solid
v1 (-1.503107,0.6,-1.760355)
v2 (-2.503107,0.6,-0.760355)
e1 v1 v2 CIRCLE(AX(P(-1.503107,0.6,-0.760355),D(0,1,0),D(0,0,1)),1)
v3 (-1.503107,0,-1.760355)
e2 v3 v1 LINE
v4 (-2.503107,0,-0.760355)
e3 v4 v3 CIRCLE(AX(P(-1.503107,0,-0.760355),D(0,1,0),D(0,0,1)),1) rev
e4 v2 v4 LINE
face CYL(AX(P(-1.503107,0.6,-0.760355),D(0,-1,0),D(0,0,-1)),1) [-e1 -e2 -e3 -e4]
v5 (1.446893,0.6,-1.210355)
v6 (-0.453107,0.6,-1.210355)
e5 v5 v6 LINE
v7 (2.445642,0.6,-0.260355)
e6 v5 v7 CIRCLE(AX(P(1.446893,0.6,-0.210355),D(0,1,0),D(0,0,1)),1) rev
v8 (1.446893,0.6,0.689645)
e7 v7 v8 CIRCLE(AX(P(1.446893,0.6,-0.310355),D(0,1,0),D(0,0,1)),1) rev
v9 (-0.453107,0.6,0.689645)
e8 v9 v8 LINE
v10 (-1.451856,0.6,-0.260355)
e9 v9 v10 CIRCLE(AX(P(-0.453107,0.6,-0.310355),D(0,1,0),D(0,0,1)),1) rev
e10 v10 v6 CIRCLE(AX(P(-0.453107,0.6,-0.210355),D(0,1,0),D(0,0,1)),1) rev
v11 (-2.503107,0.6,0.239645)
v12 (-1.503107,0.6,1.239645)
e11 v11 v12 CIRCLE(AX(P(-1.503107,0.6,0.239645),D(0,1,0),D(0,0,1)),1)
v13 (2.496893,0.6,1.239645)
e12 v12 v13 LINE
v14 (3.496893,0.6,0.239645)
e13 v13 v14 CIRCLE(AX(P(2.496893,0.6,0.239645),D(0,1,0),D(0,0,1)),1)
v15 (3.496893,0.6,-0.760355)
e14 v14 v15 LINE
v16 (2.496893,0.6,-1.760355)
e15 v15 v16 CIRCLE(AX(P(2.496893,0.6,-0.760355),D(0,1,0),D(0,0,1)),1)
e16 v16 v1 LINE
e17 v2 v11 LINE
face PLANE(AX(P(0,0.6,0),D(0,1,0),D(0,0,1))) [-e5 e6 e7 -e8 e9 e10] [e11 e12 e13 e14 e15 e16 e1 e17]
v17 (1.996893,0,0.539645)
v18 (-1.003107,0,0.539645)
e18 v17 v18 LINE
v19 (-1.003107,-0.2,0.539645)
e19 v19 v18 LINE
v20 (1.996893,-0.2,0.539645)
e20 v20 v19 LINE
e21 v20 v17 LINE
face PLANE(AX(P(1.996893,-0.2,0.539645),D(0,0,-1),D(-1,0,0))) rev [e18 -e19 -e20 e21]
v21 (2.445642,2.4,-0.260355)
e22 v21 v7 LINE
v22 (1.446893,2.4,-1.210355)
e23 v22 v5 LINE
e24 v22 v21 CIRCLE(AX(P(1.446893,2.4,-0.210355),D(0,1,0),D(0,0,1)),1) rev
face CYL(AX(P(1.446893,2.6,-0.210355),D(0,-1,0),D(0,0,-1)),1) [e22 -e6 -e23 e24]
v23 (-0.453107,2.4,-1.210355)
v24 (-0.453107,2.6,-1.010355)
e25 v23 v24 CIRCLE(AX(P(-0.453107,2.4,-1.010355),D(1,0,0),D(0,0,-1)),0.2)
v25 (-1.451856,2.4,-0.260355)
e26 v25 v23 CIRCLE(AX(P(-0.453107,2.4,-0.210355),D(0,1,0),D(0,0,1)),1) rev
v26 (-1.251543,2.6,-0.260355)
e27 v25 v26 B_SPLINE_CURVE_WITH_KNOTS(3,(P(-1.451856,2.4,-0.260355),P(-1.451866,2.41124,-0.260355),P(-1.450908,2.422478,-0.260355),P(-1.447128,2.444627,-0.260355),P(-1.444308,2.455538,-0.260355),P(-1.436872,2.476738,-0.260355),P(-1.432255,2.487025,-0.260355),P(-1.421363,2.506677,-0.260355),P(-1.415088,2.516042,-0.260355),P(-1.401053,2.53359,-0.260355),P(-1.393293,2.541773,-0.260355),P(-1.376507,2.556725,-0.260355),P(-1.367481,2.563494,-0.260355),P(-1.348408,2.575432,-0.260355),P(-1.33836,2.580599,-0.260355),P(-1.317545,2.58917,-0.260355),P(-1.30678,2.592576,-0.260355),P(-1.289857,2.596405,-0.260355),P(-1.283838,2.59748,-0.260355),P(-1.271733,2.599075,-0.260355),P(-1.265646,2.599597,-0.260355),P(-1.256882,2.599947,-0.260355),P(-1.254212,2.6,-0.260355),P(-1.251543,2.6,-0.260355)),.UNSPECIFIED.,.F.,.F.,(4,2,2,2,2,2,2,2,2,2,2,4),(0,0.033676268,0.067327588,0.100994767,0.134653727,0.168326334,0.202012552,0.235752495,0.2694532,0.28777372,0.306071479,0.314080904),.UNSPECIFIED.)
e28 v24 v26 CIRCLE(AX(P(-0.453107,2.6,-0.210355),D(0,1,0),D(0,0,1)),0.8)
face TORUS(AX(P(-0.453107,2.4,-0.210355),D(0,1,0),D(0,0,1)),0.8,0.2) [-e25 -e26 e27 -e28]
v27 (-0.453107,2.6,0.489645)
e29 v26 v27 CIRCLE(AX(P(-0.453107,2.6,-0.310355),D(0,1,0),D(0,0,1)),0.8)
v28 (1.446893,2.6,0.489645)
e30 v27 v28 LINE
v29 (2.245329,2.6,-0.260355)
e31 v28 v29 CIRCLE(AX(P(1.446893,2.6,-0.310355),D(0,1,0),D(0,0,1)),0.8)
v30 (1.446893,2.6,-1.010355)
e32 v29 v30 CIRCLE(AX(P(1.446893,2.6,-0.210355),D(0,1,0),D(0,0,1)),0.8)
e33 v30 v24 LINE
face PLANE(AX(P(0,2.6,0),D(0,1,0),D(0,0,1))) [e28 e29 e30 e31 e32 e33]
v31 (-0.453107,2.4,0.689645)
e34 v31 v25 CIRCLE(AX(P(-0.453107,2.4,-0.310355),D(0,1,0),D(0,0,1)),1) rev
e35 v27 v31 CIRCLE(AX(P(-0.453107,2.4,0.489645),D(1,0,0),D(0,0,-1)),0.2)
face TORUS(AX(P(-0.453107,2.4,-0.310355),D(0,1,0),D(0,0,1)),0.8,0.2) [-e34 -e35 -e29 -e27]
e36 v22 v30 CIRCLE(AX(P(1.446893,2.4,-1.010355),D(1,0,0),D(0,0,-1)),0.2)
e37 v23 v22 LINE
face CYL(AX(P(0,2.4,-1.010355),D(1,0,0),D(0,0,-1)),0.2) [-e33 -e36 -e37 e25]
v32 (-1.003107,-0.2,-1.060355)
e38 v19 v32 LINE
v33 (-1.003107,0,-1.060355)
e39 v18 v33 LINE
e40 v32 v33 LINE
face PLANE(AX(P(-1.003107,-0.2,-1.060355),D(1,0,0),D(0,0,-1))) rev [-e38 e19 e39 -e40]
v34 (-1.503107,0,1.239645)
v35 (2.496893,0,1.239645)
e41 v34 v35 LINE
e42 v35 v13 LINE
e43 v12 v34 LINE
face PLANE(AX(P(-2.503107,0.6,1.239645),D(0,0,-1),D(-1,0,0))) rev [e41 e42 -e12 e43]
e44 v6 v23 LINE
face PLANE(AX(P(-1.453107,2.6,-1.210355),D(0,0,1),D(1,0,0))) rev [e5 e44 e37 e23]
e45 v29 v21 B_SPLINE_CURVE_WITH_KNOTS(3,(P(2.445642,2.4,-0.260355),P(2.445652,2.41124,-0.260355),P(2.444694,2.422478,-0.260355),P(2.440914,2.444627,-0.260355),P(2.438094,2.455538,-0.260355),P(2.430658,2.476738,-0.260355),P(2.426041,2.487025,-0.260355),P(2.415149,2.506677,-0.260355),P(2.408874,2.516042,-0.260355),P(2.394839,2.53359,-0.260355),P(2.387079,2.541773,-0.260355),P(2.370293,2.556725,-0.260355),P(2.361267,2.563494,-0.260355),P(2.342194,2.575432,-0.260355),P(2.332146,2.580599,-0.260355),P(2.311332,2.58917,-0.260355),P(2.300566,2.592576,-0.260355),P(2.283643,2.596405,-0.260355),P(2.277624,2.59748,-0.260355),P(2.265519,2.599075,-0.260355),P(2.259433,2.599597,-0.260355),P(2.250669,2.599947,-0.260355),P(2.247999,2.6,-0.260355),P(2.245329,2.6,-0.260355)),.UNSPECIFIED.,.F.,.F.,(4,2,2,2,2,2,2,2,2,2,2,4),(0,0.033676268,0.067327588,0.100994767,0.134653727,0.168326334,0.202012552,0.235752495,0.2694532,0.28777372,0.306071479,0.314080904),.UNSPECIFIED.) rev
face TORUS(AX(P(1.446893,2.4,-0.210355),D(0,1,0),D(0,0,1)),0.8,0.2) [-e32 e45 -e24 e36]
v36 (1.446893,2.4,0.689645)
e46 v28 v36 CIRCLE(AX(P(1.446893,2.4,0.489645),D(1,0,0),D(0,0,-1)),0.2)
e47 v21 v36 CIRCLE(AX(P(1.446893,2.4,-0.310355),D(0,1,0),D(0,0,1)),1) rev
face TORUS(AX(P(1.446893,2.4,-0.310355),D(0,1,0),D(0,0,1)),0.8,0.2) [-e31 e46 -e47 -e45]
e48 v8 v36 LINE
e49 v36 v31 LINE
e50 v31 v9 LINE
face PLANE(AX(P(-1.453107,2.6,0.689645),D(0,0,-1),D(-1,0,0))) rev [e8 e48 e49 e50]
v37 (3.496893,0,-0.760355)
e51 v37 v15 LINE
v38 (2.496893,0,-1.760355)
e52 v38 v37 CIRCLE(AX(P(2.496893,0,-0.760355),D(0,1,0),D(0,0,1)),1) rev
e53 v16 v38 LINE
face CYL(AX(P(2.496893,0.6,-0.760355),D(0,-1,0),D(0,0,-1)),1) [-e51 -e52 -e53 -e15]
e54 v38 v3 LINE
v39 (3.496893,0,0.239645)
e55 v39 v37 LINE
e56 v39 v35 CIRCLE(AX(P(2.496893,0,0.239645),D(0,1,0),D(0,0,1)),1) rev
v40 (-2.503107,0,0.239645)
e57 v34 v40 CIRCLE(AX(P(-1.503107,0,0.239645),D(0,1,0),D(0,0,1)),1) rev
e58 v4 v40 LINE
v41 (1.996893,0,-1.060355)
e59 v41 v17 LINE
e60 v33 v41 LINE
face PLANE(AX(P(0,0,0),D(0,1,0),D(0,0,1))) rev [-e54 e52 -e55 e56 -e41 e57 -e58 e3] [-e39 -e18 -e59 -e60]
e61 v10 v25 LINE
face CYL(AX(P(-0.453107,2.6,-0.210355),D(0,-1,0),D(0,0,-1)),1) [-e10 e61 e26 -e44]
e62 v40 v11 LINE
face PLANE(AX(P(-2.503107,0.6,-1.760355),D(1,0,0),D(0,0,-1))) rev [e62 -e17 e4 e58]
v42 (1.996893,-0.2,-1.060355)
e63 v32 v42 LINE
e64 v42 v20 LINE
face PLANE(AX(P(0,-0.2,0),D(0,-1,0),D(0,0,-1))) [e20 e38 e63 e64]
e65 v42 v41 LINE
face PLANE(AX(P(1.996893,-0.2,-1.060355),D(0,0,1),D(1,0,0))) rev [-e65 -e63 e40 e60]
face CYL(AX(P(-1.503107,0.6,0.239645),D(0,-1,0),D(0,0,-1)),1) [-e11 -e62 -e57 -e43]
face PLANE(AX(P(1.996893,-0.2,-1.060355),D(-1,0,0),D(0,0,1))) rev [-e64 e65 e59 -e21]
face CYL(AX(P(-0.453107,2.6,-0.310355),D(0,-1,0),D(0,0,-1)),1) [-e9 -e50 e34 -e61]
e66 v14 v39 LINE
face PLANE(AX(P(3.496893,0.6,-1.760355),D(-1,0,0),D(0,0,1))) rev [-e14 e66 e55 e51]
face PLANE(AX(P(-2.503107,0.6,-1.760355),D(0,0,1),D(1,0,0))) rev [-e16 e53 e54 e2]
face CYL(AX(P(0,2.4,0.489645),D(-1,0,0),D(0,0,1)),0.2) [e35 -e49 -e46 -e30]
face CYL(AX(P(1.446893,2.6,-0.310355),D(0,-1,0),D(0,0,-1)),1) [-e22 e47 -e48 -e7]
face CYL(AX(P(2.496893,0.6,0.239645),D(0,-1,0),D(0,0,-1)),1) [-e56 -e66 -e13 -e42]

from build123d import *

# Parameters (mm, degrees)
SKETCH_1_W      = 6
SKETCH_1_H      = 3
EXTRUDE_1_DEPTH = 0.6
SKETCH_2_W      = 3.9
SKETCH_2_H      = 1.9
EXTRUDE_2_DEPTH = 2
FILLET_1_R      = 1
SKETCH_3_W      = 3
SKETCH_3_H      = 1.6
EXTRUDE_3_DEPTH = 0.2
FILLET_2_R      = 0.2


with BuildPart() as part:
    # 草图1 → 凸台-拉伸1 (new body)
    with BuildSketch(Plane(origin=(0, 0, 0), x_dir=(1, 0, 0), z_dir=(0, 1, 0))):
        with Locations((0.496893044, 0.260354793)):
            Rectangle(SKETCH_1_W, SKETCH_1_H)
    extrude(amount=EXTRUDE_1_DEPTH)

    # 草图2 → 凸台-拉伸2 (add)
    with BuildSketch(Plane(origin=(0, 0.6, 0), x_dir=(1, 0, 0), z_dir=(0, 1, 0))):
        with Locations((0.496893044, 0.260354793)):
            Rectangle(SKETCH_2_W, SKETCH_2_H)
    extrude(amount=EXTRUDE_2_DEPTH)

    # 圆角1
    # the kernel refuses this fillet: 1 mm, written as the material it takes off along each edge
    with BuildSketch(Plane(origin=(3.496893044, -2.5, -1.760354793), x_dir=(-1, 0, 0), z_dir=(0, 1, 0)), Plane(origin=(3.496893044, -2.5, 1.239645207), x_dir=(0, 0, -1), z_dir=(0, 1, 0))) as fillet_1_piece_1:
        with BuildLine():
            CenterArc((FILLET_1_R, FILLET_1_R), FILLET_1_R, 180, 90)
            Line((0, FILLET_1_R), (0, 0))
            Line((0, 0), (FILLET_1_R, 0))
        make_face()
    extrude(amount=5.6, mode=Mode.SUBTRACT)
    with BuildSketch(Plane(origin=(-2.503106956, -2.5, -1.760354793), x_dir=(1, 0, 0), z_dir=(0, 1, 0)), Plane(origin=(-2.503106956, -2.5, 1.239645207), x_dir=(0, 0, -1), z_dir=(0, 1, 0))) as fillet_1_piece_2:
        with BuildLine():
            CenterArc((FILLET_1_R, -FILLET_1_R), FILLET_1_R, 90, 90)
            Line((0, -FILLET_1_R), (0, 0))
            Line((0, 0), (FILLET_1_R, 0))
        make_face()
    extrude(amount=5.6, mode=Mode.SUBTRACT)
    with BuildSketch(Plane(origin=(2.446893044, 0.6, -1.210354793), x_dir=(-1, 0, 0), z_dir=(0, 1, 0)), Plane(origin=(-1.453106956, 0.6, 0.689645207), x_dir=(1, 0, 0), z_dir=(0, 1, 0)), Plane(origin=(2.446893044, 0.6, 0.689645207), x_dir=(0, 0, -1), z_dir=(0, 1, 0))) as fillet_1_piece_3:
        with BuildLine():
            CenterArc((FILLET_1_R, FILLET_1_R), FILLET_1_R, 180, 90)
            Line((0, FILLET_1_R), (0, 0))
            Line((0, 0), (FILLET_1_R, 0))
        make_face()
    extrude(amount=4.5, mode=Mode.SUBTRACT)
    with BuildSketch(Plane(origin=(-1.453106956, 0.6, -1.210354793), x_dir=(1, 0, 0), z_dir=(0, 1, 0))) as fillet_1_piece_4:
        with BuildLine():
            CenterArc((FILLET_1_R, -FILLET_1_R), FILLET_1_R, 90, 90)
            Line((0, -FILLET_1_R), (0, 0))
            Line((0, 0), (FILLET_1_R, 0))
        make_face()
    extrude(amount=4.5, mode=Mode.SUBTRACT)

    # 草图3 → 凸台-拉伸3 (add)
    with BuildSketch(Plane(origin=(0, 0, 0), x_dir=(-1, 0, 0), z_dir=(0, -1, 0))):
        with Locations((-0.496893044, 0.260354793)):
            Rectangle(SKETCH_3_W, SKETCH_3_H)
    extrude(amount=EXTRUDE_3_DEPTH)

    # 圆角2
    # the kernel refuses this fillet: 0.2 mm, written as the material it takes off along each edge
    with BuildSketch(Plane(origin=(-0.453106956, 2.6, -1.210354793), x_dir=(0, -1, 0), z_dir=(1, 0, 0)), Plane(origin=(1.446893044, 2.6, 0.689645207), x_dir=(0, -1, 0), z_dir=(-1, 0, 0))) as fillet_2_piece_1:
        with BuildLine():
            CenterArc((FILLET_2_R, -FILLET_2_R), FILLET_2_R, 90, 90)
            Line((0, -FILLET_2_R), (0, 0))
            Line((0, 0), (FILLET_2_R, 0))
        make_face()
    extrude(amount=1.9, mode=Mode.SUBTRACT)
    with BuildSketch(Plane(origin=(1.446893044, 2.6, -0.310354793), x_dir=(0.900374274099907, 0, -0.4351162678400631), z_dir=(-0.4351162678400631, 0, -0.900374274099907))) as fillet_2_piece_2:
        with BuildLine():
            CenterArc((1 - FILLET_2_R, FILLET_2_R), FILLET_2_R, 270, 90)
            Line((1 - FILLET_2_R, 0), (1, 0))
            Line((1, 0), (1, FILLET_2_R))
        make_face()
    revolve(axis=Axis((1.446893044, 2.6, -0.310354793), (0, -1, 0)), revolution_arc=115.792692411, mode=Mode.SUBTRACT)
    with BuildSketch(Plane(origin=(1.446893044, 2.6, -0.210354793), x_dir=(0, 0, -1), z_dir=(-1, 0, 0))) as fillet_2_piece_3:
        with BuildLine():
            CenterArc((1 - FILLET_2_R, FILLET_2_R), FILLET_2_R, 270, 90)
            Line((1 - FILLET_2_R, 0), (1, 0))
            Line((1, 0), (1, FILLET_2_R))
        make_face()
    revolve(axis=Axis((1.446893044, 2.6, -0.210354793), (0, -1, 0)), revolution_arc=115.792692411, mode=Mode.SUBTRACT)
    with BuildSketch(Plane(origin=(-0.453106956, 2.6, -0.310354793), x_dir=(0, 0, 1), z_dir=(1, 0, 0))) as fillet_2_piece_4:
        with BuildLine():
            CenterArc((1 - FILLET_2_R, FILLET_2_R), FILLET_2_R, 270, 90)
            Line((1 - FILLET_2_R, 0), (1, 0))
            Line((1, 0), (1, FILLET_2_R))
        make_face()
    revolve(axis=Axis((-0.453106956, 2.6, -0.310354793), (0, -1, 0)), revolution_arc=115.792692411, mode=Mode.SUBTRACT)
    with BuildSketch(Plane(origin=(-0.453106956, 2.6, -0.210354793), x_dir=(-0.9003742740999057, 0, 0.43511626784006596), z_dir=(0.43511626784006596, 0, 0.9003742740999057))) as fillet_2_piece_5:
        with BuildLine():
            CenterArc((1 - FILLET_2_R, FILLET_2_R), FILLET_2_R, 270, 90)
            Line((1 - FILLET_2_R, 0), (1, 0))
            Line((1, 0), (1, FILLET_2_R))
        make_face()
    revolve(axis=Axis((-0.453106956, 2.6, -0.210354793), (0, -1, 0)), revolution_arc=115.792692411, mode=Mode.SUBTRACT)


solid = part.part
